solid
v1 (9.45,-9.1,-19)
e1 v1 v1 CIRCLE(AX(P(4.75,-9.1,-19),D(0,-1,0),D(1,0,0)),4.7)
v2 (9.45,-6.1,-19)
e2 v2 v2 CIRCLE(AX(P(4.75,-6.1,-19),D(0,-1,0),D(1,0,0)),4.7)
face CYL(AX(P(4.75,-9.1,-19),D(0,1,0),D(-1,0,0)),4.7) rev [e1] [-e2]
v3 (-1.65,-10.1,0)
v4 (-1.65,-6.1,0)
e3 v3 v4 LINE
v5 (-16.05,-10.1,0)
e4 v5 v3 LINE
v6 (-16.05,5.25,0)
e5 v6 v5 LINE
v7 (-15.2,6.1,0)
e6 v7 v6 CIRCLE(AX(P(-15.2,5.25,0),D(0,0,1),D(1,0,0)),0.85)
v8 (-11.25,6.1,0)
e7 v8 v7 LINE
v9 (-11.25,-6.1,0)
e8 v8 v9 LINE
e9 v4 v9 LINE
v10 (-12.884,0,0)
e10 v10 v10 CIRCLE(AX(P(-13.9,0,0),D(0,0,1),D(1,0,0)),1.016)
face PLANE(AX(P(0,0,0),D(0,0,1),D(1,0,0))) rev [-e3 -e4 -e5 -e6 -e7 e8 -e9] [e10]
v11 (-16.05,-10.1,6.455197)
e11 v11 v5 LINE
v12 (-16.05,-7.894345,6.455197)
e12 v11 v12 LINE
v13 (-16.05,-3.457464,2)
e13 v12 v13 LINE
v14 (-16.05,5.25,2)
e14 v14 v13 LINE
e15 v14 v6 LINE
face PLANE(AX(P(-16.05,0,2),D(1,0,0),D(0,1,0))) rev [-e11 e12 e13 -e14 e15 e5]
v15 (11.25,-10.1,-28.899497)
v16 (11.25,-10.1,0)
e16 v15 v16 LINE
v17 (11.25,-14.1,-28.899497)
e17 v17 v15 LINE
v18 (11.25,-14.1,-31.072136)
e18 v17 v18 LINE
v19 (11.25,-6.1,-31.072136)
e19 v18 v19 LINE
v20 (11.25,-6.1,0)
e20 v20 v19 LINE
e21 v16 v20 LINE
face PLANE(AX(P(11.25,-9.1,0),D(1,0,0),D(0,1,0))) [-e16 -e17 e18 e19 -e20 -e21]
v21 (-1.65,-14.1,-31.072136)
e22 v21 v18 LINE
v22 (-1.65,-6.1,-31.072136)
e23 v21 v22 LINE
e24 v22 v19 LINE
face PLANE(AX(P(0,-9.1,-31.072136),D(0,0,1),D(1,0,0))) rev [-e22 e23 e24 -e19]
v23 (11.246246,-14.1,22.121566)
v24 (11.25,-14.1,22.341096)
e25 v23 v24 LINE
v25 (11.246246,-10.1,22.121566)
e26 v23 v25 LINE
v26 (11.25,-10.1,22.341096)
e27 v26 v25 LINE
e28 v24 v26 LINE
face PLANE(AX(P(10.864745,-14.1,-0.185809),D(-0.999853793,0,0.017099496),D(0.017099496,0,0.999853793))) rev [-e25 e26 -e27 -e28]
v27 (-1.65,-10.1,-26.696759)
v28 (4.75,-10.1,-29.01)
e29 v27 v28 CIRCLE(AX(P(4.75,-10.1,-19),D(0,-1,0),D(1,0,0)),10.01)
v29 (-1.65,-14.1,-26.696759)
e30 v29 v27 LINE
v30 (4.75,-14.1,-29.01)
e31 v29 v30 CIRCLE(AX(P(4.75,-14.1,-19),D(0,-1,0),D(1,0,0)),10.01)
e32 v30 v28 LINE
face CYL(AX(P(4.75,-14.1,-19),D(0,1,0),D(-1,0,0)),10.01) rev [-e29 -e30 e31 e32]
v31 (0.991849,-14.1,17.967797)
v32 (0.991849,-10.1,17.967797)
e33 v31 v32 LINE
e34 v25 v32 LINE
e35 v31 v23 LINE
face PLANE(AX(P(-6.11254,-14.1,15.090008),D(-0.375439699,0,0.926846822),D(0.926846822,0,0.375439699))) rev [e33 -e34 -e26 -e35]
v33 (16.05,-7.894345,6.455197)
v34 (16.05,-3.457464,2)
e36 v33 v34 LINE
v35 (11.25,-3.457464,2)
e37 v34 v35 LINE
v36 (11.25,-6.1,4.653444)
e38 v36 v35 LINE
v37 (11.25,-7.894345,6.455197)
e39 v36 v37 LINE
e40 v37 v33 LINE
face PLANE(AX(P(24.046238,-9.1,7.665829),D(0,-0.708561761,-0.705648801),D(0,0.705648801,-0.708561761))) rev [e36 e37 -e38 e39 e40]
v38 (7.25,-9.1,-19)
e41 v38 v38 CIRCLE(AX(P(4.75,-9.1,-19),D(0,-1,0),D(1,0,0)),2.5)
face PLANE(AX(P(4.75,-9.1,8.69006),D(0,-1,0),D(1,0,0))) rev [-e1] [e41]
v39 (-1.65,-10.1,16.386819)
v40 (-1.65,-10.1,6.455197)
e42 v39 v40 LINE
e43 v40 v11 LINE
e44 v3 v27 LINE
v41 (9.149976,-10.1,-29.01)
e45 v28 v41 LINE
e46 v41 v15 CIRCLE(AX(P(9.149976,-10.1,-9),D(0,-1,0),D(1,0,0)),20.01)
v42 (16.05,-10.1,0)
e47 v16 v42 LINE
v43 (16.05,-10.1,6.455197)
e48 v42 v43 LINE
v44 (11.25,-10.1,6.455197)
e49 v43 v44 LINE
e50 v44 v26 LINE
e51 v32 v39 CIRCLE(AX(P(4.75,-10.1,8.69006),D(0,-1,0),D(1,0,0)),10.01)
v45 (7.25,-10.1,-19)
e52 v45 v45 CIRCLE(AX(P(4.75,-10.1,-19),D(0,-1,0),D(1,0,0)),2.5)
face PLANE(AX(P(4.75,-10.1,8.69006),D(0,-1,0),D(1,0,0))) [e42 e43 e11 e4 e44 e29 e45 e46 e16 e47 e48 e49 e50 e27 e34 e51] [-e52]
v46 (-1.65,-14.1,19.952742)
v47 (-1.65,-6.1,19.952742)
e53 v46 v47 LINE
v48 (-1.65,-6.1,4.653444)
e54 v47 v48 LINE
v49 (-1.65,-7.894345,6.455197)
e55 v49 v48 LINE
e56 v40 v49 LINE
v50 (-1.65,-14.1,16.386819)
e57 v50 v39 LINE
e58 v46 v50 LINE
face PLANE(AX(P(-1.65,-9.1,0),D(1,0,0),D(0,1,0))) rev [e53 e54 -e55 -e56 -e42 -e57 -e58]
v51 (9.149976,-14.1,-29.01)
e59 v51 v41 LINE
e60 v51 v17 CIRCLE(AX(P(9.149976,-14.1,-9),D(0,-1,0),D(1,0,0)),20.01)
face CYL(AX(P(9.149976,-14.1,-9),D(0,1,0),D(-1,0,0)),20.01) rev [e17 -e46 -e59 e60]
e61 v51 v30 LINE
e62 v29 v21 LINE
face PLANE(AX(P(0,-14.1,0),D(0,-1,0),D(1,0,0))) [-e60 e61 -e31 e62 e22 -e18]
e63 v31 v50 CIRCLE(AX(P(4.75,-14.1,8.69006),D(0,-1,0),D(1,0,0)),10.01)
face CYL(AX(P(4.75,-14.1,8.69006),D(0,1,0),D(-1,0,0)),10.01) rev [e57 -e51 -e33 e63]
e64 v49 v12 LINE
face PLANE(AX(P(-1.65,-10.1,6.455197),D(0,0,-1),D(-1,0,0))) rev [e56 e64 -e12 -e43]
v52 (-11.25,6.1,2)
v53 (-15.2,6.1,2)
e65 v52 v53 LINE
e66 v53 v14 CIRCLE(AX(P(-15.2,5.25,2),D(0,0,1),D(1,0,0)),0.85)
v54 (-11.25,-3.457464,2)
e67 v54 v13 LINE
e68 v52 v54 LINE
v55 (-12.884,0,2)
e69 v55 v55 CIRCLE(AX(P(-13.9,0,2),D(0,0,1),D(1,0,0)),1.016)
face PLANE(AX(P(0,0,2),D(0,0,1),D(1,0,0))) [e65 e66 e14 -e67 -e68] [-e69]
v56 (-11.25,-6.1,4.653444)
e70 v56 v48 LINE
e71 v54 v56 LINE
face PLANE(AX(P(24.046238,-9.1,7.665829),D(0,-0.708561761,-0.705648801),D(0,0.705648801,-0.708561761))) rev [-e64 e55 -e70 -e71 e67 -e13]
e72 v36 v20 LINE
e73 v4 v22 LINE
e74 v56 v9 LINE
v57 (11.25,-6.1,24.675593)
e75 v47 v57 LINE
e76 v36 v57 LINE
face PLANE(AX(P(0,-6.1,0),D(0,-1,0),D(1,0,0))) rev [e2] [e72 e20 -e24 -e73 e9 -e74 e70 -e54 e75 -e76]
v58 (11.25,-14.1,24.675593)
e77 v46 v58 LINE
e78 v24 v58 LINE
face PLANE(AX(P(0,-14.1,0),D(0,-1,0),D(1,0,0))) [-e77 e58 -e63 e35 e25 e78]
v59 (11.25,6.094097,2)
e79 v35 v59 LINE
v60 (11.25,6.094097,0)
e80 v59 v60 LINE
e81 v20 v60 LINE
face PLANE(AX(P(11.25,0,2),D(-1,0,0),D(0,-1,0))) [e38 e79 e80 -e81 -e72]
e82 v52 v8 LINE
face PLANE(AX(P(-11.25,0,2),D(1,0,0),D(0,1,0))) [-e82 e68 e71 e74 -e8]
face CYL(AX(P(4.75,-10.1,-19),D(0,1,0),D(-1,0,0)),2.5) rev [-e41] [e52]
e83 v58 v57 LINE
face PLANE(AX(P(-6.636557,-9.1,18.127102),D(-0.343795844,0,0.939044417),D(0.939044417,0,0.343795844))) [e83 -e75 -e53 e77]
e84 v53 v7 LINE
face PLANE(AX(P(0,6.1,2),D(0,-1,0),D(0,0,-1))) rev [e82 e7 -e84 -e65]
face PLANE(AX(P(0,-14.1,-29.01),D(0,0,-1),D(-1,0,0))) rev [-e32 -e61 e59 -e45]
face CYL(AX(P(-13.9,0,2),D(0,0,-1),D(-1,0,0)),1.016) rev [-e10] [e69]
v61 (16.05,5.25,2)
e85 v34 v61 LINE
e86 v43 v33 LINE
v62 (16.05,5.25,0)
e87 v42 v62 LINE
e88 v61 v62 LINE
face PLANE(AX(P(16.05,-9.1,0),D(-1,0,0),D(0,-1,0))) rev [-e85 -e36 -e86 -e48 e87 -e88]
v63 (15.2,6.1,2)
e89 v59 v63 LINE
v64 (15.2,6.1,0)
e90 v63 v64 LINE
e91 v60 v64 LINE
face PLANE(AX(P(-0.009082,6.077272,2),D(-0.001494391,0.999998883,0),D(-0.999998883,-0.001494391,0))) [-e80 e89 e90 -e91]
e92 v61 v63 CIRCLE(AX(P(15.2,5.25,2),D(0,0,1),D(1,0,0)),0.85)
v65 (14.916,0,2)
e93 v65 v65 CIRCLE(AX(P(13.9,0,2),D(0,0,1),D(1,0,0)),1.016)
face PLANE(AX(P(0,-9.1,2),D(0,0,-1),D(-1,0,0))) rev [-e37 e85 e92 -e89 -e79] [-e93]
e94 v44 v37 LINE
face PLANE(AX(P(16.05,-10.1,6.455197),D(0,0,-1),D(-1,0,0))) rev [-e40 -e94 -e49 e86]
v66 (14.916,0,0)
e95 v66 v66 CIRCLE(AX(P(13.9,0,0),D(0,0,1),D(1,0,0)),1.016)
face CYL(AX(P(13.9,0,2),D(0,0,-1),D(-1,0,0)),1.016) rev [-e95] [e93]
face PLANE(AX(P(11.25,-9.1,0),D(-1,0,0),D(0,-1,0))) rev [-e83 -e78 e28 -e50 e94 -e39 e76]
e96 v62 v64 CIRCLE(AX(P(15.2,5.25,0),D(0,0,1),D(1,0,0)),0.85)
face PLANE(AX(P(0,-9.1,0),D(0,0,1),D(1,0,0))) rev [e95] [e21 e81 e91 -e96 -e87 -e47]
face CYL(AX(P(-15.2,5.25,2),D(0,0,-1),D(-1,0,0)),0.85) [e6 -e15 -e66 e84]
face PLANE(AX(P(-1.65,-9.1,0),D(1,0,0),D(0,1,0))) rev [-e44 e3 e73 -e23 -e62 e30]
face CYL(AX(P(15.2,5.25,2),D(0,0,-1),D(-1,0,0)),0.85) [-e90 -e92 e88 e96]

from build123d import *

# Parameters (mm, degrees)
SKETCH1_R                       = 1.016
BOSS_EXTRUDE1_DEPTH             = 2
BOSS_EXTRUDE2_OUTLINE_R         = 4.7
BOSS_EXTRUDE2_DEPTH             = 3
BOSS_EXTRUDE5_DEPTH             = 8
BOSS_EXTRUDE6_REACH             = 45.699
BOSS_EXTRUDE6_DIRECTION_2_REACH = 45.699
SKETCH4_W                       = 22.5
SKETCH4_H                       = 14.127681706
CUT_EXTRUDE1_DEPTH              = 7
FILLET1_R                       = 0.5
SKETCH5_R                       = 2.5
BOSS_EXTRUDE7_DEPTH             = 1
SKETCH6_W                       = 5.313656685
SKETCH6_H                       = 4.599259183
SKETCH6_W_2                     = 16.163165117
SKETCH6_H_2                     = 5.344557169
CUT_EXTRUDE2_DEPTH              = 5


# Read off the part's stored shape, not the designer's step: Boss-Extrude2
with BuildPart() as part:
    # Sketch1 → Boss-Extrude1 (new body)
    # profile 1 of 4: a face of its own
    with BuildSketch(Plane.XY):
        with BuildLine():
            Line((-16.05, 5.25), (-16.05, -5.25))
            ThreePointArc((-16.05, -5.25), (-15.801040764, -5.851040764), (-15.2, -6.1))
            Line((-15.2, -6.1), (-11.25, -6.1))
            Line((-11.25, -6.1), (-11.25, 6.1))
            Line((-11.25, 6.1), (-15.2, 6.1))
            ThreePointArc((-15.2, 6.1), (-15.801040764, 5.851040764), (-16.05, 5.25))
        make_face()
        with Locations((-13.9, 0)):
            Circle(SKETCH1_R, mode=Mode.SUBTRACT)
    # profile 2 of 4: a face of its own
    with BuildSketch(Plane.XY):
        with BuildLine():
            Line((16.05, 5.25), (16.05, -5.25))
            ThreePointArc((16.05, -5.25), (15.801040764, -5.851040764), (15.2, -6.1))
            Line((15.2, -6.1), (11.25, -6.1))
            Line((11.25, -6.1), (11.25, 6.094097151))
            Line((11.25, 6.094097151), (15.2, 6.1))
            ThreePointArc((15.2, 6.1), (15.801040764, 5.851040764), (16.05, 5.25))
        make_face()
        with Locations((13.9, 0)):
            Circle(SKETCH1_R, mode=Mode.SUBTRACT)
    # profile 3 of 4: a face of its own
    with BuildSketch(Plane.XY):
        with BuildLine():
            ThreePointArc((15.2, -6.1), (15.801040764, -5.851040764), (16.05, -5.25))
            Line((16.05, -5.25), (16.05, -6.1))
            Line((16.05, -6.1), (15.2, -6.1))
        make_face()
    # profile 4 of 4: a face of its own
    with BuildSketch(Plane.XY):
        with BuildLine():
            ThreePointArc((-16.05, -5.25), (-15.801040764, -5.851040764), (-15.2, -6.1))
            Line((-15.2, -6.1), (-16.05, -6.1))
            Line((-16.05, -6.1), (-16.05, -5.25))
        make_face()
    extrude(amount=BOSS_EXTRUDE1_DEPTH)

    # Boss-Extrude2 outline → Boss-Extrude2 (add)
    with BuildSketch(Plane.XZ.offset(6.1)):
        Polygon((-16.05, 2), (-16.05, 0), (-1.65, 0), (-1.65, -31.072136217), (11.25, -31.072136217), (11.25, 0), (16.05, 0), (16.05, 2), (11.25, 2), (11.25, 24.675592953), (-1.65, 19.952742461), (-1.65, 2), align=None)
        with Locations((4.75, -19)):
            Circle(BOSS_EXTRUDE2_OUTLINE_R, mode=Mode.SUBTRACT)
    extrude(amount=BOSS_EXTRUDE2_DEPTH)

    # Sketch2<3> → Boss-Extrude5 (add)
    with BuildSketch(Plane.XZ.offset(6.1)):
        with BuildLine():
            Line((-1.65, 19.952742461), (-1.65, 16.386819499))
            ThreePointArc((-1.65, 16.386819499), (-0.390222028, 17.279485189), (0.991848608, 17.967797132))
            Line((0.991848608, 17.967797132), (11.246245603, 22.12156627))
            Line((11.246245603, 22.12156627), (11.25, 22.341096015))
            Line((11.25, 22.341096015), (11.25, 24.675592953))
            Line((11.25, 24.675592953), (-1.65, 19.952742461))
        make_face()
        with BuildLine():
            ThreePointArc((4.75, -29.01), (1.347387634, -28.413943333), (-1.65, -26.696759058))
            Line((-1.65, -26.696759058), (-1.65, -31.072136217))
            Line((-1.65, -31.072136217), (11.25, -31.072136217))
            Line((11.25, -31.072136217), (11.25, -28.899497484))
            ThreePointArc((11.25, -28.899497484), (10.201440757, -28.982355275), (9.149976222, -29.01))
            Line((9.149976222, -29.01), (4.75, -29.01))
        make_face()
    extrude(amount=BOSS_EXTRUDE5_DEPTH)

    # Boss-Extrude6: up to this face of the body (flat: up to its plane)
    boss_extrude6_end = Plane(part.part.faces().sort_by_distance((16.05, -1.925, 1))[0])
    # Sketch3 → Boss-Extrude6 (add, up to the picked face)
    with BuildSketch(Plane(origin=(11.25, 0, 0), x_dir=(0, 0, -1), z_dir=(1, 0, 0)), mode=Mode.PRIVATE) as boss_extrude6_sk1:
        Polygon((-7.665828596, -9.1), (-2, -3.457464127), (-2, -9.1), align=None)
    boss_extrude6_tool1 = split(extrude(boss_extrude6_sk1.sketch, amount=BOSS_EXTRUDE6_REACH, mode=Mode.PRIVATE), bisect_by=boss_extrude6_end, keep=Keep.BOTH, mode=Mode.PRIVATE)
    add(boss_extrude6_tool1.solids().sort_by(Axis((11.25, -7.219155, 3.88861), (1, 0, 0)))[0])

    # Boss-Extrude6 direction 2: up to this face of the body (flat: up to its plane)
    boss_extrude6_direction_2_end = Plane(part.part.faces().sort_by_distance((-16.05, -1.925, 1))[0])
    # Sketch3 → Boss-Extrude6 direction 2 (add, up to the picked face)
    with BuildSketch(Plane(origin=(11.25, 0, 0), x_dir=(0, 0, -1), z_dir=(1, 0, 0)), mode=Mode.PRIVATE) as boss_extrude6_direction_2_sk1:
        Polygon((-7.665828596, -9.1), (-2, -3.457464127), (-2, -9.1), align=None)
    boss_extrude6_direction_2_tool1 = split(extrude(boss_extrude6_direction_2_sk1.sketch, amount=-BOSS_EXTRUDE6_DIRECTION_2_REACH, mode=Mode.PRIVATE), bisect_by=boss_extrude6_direction_2_end, keep=Keep.BOTH, mode=Mode.PRIVATE)
    add(boss_extrude6_direction_2_tool1.solids().sort_by(Axis((11.25, -7.219155, 3.88861), (-1, 0, 0)))[0])

    # Sketch4 → Cut-Extrude1 (cut)
    with BuildSketch(Plane(origin=(0, -6.1, 0), x_dir=(1, 0, 0), z_dir=(0, 1, 0))):
        with Locations((0, -7.063840853)):
            Rectangle(SKETCH4_W, SKETCH4_H)
    extrude(amount=CUT_EXTRUDE1_DEPTH, mode=Mode.SUBTRACT)

    # Fillet1
    fillet1_edges = [part.edges().sort_by_distance(p)[0] for p in [
        (13.65, -9.1, 7.665828596),
        (-8.85, -9.1, 7.665828596),
    ]]
    fillet(fillet1_edges, radius=FILLET1_R)

    # Sketch5 → Boss-Extrude7 (add)
    with BuildSketch(Plane.XZ.offset(9.1)):
        with BuildLine():
            Line((-1.65, 16.386819499), (-1.65, 6.455196792))
            Line((-1.65, 6.455196792), (-16.05, 6.455196792))
            Line((-16.05, 6.455196792), (-16.05, 0))
            Line((-16.05, 0), (-1.65, 0))
            Line((-1.65, 0), (-1.65, -26.696759058))
            ThreePointArc((-1.65, -26.696759058), (1.347387634, -28.413943333), (4.75, -29.01))
            Line((4.75, -29.01), (9.149976222, -29.01))
            ThreePointArc((9.149976222, -29.01), (10.201440757, -28.982355275), (11.25, -28.899497484))
            Line((11.25, -28.899497484), (11.25, 0))
            Line((11.25, 0), (16.05, 0))
            Line((16.05, 0), (16.05, 6.455196792))
            Line((16.05, 6.455196792), (11.25, 6.455196792))
            Line((11.25, 6.455196792), (11.25, 22.341096015))
            Line((11.25, 22.341096015), (11.246245603, 22.12156627))
            Line((11.246245603, 22.12156627), (0.991848608, 17.967797132))
            ThreePointArc((0.991848608, 17.967797132), (-0.390222028, 17.279485189), (-1.65, 16.386819499))
        make_face()
        with Locations((4.75, -19)):
            Circle(SKETCH5_R, mode=Mode.SUBTRACT)
    extrude(amount=BOSS_EXTRUDE7_DEPTH)

    # Sketch6 → Cut-Extrude2 (cut)
    with BuildSketch(Plane.XY.offset(6.455196792)):
        with Locations((13.906828343, -7.800370409)):
            Rectangle(SKETCH6_W, SKETCH6_H)
        with Locations((-9.731582558, -7.427721416)):
            Rectangle(SKETCH6_W_2, SKETCH6_H_2)
    extrude(amount=CUT_EXTRUDE2_DEPTH, mode=Mode.SUBTRACT)


solid = part.part
